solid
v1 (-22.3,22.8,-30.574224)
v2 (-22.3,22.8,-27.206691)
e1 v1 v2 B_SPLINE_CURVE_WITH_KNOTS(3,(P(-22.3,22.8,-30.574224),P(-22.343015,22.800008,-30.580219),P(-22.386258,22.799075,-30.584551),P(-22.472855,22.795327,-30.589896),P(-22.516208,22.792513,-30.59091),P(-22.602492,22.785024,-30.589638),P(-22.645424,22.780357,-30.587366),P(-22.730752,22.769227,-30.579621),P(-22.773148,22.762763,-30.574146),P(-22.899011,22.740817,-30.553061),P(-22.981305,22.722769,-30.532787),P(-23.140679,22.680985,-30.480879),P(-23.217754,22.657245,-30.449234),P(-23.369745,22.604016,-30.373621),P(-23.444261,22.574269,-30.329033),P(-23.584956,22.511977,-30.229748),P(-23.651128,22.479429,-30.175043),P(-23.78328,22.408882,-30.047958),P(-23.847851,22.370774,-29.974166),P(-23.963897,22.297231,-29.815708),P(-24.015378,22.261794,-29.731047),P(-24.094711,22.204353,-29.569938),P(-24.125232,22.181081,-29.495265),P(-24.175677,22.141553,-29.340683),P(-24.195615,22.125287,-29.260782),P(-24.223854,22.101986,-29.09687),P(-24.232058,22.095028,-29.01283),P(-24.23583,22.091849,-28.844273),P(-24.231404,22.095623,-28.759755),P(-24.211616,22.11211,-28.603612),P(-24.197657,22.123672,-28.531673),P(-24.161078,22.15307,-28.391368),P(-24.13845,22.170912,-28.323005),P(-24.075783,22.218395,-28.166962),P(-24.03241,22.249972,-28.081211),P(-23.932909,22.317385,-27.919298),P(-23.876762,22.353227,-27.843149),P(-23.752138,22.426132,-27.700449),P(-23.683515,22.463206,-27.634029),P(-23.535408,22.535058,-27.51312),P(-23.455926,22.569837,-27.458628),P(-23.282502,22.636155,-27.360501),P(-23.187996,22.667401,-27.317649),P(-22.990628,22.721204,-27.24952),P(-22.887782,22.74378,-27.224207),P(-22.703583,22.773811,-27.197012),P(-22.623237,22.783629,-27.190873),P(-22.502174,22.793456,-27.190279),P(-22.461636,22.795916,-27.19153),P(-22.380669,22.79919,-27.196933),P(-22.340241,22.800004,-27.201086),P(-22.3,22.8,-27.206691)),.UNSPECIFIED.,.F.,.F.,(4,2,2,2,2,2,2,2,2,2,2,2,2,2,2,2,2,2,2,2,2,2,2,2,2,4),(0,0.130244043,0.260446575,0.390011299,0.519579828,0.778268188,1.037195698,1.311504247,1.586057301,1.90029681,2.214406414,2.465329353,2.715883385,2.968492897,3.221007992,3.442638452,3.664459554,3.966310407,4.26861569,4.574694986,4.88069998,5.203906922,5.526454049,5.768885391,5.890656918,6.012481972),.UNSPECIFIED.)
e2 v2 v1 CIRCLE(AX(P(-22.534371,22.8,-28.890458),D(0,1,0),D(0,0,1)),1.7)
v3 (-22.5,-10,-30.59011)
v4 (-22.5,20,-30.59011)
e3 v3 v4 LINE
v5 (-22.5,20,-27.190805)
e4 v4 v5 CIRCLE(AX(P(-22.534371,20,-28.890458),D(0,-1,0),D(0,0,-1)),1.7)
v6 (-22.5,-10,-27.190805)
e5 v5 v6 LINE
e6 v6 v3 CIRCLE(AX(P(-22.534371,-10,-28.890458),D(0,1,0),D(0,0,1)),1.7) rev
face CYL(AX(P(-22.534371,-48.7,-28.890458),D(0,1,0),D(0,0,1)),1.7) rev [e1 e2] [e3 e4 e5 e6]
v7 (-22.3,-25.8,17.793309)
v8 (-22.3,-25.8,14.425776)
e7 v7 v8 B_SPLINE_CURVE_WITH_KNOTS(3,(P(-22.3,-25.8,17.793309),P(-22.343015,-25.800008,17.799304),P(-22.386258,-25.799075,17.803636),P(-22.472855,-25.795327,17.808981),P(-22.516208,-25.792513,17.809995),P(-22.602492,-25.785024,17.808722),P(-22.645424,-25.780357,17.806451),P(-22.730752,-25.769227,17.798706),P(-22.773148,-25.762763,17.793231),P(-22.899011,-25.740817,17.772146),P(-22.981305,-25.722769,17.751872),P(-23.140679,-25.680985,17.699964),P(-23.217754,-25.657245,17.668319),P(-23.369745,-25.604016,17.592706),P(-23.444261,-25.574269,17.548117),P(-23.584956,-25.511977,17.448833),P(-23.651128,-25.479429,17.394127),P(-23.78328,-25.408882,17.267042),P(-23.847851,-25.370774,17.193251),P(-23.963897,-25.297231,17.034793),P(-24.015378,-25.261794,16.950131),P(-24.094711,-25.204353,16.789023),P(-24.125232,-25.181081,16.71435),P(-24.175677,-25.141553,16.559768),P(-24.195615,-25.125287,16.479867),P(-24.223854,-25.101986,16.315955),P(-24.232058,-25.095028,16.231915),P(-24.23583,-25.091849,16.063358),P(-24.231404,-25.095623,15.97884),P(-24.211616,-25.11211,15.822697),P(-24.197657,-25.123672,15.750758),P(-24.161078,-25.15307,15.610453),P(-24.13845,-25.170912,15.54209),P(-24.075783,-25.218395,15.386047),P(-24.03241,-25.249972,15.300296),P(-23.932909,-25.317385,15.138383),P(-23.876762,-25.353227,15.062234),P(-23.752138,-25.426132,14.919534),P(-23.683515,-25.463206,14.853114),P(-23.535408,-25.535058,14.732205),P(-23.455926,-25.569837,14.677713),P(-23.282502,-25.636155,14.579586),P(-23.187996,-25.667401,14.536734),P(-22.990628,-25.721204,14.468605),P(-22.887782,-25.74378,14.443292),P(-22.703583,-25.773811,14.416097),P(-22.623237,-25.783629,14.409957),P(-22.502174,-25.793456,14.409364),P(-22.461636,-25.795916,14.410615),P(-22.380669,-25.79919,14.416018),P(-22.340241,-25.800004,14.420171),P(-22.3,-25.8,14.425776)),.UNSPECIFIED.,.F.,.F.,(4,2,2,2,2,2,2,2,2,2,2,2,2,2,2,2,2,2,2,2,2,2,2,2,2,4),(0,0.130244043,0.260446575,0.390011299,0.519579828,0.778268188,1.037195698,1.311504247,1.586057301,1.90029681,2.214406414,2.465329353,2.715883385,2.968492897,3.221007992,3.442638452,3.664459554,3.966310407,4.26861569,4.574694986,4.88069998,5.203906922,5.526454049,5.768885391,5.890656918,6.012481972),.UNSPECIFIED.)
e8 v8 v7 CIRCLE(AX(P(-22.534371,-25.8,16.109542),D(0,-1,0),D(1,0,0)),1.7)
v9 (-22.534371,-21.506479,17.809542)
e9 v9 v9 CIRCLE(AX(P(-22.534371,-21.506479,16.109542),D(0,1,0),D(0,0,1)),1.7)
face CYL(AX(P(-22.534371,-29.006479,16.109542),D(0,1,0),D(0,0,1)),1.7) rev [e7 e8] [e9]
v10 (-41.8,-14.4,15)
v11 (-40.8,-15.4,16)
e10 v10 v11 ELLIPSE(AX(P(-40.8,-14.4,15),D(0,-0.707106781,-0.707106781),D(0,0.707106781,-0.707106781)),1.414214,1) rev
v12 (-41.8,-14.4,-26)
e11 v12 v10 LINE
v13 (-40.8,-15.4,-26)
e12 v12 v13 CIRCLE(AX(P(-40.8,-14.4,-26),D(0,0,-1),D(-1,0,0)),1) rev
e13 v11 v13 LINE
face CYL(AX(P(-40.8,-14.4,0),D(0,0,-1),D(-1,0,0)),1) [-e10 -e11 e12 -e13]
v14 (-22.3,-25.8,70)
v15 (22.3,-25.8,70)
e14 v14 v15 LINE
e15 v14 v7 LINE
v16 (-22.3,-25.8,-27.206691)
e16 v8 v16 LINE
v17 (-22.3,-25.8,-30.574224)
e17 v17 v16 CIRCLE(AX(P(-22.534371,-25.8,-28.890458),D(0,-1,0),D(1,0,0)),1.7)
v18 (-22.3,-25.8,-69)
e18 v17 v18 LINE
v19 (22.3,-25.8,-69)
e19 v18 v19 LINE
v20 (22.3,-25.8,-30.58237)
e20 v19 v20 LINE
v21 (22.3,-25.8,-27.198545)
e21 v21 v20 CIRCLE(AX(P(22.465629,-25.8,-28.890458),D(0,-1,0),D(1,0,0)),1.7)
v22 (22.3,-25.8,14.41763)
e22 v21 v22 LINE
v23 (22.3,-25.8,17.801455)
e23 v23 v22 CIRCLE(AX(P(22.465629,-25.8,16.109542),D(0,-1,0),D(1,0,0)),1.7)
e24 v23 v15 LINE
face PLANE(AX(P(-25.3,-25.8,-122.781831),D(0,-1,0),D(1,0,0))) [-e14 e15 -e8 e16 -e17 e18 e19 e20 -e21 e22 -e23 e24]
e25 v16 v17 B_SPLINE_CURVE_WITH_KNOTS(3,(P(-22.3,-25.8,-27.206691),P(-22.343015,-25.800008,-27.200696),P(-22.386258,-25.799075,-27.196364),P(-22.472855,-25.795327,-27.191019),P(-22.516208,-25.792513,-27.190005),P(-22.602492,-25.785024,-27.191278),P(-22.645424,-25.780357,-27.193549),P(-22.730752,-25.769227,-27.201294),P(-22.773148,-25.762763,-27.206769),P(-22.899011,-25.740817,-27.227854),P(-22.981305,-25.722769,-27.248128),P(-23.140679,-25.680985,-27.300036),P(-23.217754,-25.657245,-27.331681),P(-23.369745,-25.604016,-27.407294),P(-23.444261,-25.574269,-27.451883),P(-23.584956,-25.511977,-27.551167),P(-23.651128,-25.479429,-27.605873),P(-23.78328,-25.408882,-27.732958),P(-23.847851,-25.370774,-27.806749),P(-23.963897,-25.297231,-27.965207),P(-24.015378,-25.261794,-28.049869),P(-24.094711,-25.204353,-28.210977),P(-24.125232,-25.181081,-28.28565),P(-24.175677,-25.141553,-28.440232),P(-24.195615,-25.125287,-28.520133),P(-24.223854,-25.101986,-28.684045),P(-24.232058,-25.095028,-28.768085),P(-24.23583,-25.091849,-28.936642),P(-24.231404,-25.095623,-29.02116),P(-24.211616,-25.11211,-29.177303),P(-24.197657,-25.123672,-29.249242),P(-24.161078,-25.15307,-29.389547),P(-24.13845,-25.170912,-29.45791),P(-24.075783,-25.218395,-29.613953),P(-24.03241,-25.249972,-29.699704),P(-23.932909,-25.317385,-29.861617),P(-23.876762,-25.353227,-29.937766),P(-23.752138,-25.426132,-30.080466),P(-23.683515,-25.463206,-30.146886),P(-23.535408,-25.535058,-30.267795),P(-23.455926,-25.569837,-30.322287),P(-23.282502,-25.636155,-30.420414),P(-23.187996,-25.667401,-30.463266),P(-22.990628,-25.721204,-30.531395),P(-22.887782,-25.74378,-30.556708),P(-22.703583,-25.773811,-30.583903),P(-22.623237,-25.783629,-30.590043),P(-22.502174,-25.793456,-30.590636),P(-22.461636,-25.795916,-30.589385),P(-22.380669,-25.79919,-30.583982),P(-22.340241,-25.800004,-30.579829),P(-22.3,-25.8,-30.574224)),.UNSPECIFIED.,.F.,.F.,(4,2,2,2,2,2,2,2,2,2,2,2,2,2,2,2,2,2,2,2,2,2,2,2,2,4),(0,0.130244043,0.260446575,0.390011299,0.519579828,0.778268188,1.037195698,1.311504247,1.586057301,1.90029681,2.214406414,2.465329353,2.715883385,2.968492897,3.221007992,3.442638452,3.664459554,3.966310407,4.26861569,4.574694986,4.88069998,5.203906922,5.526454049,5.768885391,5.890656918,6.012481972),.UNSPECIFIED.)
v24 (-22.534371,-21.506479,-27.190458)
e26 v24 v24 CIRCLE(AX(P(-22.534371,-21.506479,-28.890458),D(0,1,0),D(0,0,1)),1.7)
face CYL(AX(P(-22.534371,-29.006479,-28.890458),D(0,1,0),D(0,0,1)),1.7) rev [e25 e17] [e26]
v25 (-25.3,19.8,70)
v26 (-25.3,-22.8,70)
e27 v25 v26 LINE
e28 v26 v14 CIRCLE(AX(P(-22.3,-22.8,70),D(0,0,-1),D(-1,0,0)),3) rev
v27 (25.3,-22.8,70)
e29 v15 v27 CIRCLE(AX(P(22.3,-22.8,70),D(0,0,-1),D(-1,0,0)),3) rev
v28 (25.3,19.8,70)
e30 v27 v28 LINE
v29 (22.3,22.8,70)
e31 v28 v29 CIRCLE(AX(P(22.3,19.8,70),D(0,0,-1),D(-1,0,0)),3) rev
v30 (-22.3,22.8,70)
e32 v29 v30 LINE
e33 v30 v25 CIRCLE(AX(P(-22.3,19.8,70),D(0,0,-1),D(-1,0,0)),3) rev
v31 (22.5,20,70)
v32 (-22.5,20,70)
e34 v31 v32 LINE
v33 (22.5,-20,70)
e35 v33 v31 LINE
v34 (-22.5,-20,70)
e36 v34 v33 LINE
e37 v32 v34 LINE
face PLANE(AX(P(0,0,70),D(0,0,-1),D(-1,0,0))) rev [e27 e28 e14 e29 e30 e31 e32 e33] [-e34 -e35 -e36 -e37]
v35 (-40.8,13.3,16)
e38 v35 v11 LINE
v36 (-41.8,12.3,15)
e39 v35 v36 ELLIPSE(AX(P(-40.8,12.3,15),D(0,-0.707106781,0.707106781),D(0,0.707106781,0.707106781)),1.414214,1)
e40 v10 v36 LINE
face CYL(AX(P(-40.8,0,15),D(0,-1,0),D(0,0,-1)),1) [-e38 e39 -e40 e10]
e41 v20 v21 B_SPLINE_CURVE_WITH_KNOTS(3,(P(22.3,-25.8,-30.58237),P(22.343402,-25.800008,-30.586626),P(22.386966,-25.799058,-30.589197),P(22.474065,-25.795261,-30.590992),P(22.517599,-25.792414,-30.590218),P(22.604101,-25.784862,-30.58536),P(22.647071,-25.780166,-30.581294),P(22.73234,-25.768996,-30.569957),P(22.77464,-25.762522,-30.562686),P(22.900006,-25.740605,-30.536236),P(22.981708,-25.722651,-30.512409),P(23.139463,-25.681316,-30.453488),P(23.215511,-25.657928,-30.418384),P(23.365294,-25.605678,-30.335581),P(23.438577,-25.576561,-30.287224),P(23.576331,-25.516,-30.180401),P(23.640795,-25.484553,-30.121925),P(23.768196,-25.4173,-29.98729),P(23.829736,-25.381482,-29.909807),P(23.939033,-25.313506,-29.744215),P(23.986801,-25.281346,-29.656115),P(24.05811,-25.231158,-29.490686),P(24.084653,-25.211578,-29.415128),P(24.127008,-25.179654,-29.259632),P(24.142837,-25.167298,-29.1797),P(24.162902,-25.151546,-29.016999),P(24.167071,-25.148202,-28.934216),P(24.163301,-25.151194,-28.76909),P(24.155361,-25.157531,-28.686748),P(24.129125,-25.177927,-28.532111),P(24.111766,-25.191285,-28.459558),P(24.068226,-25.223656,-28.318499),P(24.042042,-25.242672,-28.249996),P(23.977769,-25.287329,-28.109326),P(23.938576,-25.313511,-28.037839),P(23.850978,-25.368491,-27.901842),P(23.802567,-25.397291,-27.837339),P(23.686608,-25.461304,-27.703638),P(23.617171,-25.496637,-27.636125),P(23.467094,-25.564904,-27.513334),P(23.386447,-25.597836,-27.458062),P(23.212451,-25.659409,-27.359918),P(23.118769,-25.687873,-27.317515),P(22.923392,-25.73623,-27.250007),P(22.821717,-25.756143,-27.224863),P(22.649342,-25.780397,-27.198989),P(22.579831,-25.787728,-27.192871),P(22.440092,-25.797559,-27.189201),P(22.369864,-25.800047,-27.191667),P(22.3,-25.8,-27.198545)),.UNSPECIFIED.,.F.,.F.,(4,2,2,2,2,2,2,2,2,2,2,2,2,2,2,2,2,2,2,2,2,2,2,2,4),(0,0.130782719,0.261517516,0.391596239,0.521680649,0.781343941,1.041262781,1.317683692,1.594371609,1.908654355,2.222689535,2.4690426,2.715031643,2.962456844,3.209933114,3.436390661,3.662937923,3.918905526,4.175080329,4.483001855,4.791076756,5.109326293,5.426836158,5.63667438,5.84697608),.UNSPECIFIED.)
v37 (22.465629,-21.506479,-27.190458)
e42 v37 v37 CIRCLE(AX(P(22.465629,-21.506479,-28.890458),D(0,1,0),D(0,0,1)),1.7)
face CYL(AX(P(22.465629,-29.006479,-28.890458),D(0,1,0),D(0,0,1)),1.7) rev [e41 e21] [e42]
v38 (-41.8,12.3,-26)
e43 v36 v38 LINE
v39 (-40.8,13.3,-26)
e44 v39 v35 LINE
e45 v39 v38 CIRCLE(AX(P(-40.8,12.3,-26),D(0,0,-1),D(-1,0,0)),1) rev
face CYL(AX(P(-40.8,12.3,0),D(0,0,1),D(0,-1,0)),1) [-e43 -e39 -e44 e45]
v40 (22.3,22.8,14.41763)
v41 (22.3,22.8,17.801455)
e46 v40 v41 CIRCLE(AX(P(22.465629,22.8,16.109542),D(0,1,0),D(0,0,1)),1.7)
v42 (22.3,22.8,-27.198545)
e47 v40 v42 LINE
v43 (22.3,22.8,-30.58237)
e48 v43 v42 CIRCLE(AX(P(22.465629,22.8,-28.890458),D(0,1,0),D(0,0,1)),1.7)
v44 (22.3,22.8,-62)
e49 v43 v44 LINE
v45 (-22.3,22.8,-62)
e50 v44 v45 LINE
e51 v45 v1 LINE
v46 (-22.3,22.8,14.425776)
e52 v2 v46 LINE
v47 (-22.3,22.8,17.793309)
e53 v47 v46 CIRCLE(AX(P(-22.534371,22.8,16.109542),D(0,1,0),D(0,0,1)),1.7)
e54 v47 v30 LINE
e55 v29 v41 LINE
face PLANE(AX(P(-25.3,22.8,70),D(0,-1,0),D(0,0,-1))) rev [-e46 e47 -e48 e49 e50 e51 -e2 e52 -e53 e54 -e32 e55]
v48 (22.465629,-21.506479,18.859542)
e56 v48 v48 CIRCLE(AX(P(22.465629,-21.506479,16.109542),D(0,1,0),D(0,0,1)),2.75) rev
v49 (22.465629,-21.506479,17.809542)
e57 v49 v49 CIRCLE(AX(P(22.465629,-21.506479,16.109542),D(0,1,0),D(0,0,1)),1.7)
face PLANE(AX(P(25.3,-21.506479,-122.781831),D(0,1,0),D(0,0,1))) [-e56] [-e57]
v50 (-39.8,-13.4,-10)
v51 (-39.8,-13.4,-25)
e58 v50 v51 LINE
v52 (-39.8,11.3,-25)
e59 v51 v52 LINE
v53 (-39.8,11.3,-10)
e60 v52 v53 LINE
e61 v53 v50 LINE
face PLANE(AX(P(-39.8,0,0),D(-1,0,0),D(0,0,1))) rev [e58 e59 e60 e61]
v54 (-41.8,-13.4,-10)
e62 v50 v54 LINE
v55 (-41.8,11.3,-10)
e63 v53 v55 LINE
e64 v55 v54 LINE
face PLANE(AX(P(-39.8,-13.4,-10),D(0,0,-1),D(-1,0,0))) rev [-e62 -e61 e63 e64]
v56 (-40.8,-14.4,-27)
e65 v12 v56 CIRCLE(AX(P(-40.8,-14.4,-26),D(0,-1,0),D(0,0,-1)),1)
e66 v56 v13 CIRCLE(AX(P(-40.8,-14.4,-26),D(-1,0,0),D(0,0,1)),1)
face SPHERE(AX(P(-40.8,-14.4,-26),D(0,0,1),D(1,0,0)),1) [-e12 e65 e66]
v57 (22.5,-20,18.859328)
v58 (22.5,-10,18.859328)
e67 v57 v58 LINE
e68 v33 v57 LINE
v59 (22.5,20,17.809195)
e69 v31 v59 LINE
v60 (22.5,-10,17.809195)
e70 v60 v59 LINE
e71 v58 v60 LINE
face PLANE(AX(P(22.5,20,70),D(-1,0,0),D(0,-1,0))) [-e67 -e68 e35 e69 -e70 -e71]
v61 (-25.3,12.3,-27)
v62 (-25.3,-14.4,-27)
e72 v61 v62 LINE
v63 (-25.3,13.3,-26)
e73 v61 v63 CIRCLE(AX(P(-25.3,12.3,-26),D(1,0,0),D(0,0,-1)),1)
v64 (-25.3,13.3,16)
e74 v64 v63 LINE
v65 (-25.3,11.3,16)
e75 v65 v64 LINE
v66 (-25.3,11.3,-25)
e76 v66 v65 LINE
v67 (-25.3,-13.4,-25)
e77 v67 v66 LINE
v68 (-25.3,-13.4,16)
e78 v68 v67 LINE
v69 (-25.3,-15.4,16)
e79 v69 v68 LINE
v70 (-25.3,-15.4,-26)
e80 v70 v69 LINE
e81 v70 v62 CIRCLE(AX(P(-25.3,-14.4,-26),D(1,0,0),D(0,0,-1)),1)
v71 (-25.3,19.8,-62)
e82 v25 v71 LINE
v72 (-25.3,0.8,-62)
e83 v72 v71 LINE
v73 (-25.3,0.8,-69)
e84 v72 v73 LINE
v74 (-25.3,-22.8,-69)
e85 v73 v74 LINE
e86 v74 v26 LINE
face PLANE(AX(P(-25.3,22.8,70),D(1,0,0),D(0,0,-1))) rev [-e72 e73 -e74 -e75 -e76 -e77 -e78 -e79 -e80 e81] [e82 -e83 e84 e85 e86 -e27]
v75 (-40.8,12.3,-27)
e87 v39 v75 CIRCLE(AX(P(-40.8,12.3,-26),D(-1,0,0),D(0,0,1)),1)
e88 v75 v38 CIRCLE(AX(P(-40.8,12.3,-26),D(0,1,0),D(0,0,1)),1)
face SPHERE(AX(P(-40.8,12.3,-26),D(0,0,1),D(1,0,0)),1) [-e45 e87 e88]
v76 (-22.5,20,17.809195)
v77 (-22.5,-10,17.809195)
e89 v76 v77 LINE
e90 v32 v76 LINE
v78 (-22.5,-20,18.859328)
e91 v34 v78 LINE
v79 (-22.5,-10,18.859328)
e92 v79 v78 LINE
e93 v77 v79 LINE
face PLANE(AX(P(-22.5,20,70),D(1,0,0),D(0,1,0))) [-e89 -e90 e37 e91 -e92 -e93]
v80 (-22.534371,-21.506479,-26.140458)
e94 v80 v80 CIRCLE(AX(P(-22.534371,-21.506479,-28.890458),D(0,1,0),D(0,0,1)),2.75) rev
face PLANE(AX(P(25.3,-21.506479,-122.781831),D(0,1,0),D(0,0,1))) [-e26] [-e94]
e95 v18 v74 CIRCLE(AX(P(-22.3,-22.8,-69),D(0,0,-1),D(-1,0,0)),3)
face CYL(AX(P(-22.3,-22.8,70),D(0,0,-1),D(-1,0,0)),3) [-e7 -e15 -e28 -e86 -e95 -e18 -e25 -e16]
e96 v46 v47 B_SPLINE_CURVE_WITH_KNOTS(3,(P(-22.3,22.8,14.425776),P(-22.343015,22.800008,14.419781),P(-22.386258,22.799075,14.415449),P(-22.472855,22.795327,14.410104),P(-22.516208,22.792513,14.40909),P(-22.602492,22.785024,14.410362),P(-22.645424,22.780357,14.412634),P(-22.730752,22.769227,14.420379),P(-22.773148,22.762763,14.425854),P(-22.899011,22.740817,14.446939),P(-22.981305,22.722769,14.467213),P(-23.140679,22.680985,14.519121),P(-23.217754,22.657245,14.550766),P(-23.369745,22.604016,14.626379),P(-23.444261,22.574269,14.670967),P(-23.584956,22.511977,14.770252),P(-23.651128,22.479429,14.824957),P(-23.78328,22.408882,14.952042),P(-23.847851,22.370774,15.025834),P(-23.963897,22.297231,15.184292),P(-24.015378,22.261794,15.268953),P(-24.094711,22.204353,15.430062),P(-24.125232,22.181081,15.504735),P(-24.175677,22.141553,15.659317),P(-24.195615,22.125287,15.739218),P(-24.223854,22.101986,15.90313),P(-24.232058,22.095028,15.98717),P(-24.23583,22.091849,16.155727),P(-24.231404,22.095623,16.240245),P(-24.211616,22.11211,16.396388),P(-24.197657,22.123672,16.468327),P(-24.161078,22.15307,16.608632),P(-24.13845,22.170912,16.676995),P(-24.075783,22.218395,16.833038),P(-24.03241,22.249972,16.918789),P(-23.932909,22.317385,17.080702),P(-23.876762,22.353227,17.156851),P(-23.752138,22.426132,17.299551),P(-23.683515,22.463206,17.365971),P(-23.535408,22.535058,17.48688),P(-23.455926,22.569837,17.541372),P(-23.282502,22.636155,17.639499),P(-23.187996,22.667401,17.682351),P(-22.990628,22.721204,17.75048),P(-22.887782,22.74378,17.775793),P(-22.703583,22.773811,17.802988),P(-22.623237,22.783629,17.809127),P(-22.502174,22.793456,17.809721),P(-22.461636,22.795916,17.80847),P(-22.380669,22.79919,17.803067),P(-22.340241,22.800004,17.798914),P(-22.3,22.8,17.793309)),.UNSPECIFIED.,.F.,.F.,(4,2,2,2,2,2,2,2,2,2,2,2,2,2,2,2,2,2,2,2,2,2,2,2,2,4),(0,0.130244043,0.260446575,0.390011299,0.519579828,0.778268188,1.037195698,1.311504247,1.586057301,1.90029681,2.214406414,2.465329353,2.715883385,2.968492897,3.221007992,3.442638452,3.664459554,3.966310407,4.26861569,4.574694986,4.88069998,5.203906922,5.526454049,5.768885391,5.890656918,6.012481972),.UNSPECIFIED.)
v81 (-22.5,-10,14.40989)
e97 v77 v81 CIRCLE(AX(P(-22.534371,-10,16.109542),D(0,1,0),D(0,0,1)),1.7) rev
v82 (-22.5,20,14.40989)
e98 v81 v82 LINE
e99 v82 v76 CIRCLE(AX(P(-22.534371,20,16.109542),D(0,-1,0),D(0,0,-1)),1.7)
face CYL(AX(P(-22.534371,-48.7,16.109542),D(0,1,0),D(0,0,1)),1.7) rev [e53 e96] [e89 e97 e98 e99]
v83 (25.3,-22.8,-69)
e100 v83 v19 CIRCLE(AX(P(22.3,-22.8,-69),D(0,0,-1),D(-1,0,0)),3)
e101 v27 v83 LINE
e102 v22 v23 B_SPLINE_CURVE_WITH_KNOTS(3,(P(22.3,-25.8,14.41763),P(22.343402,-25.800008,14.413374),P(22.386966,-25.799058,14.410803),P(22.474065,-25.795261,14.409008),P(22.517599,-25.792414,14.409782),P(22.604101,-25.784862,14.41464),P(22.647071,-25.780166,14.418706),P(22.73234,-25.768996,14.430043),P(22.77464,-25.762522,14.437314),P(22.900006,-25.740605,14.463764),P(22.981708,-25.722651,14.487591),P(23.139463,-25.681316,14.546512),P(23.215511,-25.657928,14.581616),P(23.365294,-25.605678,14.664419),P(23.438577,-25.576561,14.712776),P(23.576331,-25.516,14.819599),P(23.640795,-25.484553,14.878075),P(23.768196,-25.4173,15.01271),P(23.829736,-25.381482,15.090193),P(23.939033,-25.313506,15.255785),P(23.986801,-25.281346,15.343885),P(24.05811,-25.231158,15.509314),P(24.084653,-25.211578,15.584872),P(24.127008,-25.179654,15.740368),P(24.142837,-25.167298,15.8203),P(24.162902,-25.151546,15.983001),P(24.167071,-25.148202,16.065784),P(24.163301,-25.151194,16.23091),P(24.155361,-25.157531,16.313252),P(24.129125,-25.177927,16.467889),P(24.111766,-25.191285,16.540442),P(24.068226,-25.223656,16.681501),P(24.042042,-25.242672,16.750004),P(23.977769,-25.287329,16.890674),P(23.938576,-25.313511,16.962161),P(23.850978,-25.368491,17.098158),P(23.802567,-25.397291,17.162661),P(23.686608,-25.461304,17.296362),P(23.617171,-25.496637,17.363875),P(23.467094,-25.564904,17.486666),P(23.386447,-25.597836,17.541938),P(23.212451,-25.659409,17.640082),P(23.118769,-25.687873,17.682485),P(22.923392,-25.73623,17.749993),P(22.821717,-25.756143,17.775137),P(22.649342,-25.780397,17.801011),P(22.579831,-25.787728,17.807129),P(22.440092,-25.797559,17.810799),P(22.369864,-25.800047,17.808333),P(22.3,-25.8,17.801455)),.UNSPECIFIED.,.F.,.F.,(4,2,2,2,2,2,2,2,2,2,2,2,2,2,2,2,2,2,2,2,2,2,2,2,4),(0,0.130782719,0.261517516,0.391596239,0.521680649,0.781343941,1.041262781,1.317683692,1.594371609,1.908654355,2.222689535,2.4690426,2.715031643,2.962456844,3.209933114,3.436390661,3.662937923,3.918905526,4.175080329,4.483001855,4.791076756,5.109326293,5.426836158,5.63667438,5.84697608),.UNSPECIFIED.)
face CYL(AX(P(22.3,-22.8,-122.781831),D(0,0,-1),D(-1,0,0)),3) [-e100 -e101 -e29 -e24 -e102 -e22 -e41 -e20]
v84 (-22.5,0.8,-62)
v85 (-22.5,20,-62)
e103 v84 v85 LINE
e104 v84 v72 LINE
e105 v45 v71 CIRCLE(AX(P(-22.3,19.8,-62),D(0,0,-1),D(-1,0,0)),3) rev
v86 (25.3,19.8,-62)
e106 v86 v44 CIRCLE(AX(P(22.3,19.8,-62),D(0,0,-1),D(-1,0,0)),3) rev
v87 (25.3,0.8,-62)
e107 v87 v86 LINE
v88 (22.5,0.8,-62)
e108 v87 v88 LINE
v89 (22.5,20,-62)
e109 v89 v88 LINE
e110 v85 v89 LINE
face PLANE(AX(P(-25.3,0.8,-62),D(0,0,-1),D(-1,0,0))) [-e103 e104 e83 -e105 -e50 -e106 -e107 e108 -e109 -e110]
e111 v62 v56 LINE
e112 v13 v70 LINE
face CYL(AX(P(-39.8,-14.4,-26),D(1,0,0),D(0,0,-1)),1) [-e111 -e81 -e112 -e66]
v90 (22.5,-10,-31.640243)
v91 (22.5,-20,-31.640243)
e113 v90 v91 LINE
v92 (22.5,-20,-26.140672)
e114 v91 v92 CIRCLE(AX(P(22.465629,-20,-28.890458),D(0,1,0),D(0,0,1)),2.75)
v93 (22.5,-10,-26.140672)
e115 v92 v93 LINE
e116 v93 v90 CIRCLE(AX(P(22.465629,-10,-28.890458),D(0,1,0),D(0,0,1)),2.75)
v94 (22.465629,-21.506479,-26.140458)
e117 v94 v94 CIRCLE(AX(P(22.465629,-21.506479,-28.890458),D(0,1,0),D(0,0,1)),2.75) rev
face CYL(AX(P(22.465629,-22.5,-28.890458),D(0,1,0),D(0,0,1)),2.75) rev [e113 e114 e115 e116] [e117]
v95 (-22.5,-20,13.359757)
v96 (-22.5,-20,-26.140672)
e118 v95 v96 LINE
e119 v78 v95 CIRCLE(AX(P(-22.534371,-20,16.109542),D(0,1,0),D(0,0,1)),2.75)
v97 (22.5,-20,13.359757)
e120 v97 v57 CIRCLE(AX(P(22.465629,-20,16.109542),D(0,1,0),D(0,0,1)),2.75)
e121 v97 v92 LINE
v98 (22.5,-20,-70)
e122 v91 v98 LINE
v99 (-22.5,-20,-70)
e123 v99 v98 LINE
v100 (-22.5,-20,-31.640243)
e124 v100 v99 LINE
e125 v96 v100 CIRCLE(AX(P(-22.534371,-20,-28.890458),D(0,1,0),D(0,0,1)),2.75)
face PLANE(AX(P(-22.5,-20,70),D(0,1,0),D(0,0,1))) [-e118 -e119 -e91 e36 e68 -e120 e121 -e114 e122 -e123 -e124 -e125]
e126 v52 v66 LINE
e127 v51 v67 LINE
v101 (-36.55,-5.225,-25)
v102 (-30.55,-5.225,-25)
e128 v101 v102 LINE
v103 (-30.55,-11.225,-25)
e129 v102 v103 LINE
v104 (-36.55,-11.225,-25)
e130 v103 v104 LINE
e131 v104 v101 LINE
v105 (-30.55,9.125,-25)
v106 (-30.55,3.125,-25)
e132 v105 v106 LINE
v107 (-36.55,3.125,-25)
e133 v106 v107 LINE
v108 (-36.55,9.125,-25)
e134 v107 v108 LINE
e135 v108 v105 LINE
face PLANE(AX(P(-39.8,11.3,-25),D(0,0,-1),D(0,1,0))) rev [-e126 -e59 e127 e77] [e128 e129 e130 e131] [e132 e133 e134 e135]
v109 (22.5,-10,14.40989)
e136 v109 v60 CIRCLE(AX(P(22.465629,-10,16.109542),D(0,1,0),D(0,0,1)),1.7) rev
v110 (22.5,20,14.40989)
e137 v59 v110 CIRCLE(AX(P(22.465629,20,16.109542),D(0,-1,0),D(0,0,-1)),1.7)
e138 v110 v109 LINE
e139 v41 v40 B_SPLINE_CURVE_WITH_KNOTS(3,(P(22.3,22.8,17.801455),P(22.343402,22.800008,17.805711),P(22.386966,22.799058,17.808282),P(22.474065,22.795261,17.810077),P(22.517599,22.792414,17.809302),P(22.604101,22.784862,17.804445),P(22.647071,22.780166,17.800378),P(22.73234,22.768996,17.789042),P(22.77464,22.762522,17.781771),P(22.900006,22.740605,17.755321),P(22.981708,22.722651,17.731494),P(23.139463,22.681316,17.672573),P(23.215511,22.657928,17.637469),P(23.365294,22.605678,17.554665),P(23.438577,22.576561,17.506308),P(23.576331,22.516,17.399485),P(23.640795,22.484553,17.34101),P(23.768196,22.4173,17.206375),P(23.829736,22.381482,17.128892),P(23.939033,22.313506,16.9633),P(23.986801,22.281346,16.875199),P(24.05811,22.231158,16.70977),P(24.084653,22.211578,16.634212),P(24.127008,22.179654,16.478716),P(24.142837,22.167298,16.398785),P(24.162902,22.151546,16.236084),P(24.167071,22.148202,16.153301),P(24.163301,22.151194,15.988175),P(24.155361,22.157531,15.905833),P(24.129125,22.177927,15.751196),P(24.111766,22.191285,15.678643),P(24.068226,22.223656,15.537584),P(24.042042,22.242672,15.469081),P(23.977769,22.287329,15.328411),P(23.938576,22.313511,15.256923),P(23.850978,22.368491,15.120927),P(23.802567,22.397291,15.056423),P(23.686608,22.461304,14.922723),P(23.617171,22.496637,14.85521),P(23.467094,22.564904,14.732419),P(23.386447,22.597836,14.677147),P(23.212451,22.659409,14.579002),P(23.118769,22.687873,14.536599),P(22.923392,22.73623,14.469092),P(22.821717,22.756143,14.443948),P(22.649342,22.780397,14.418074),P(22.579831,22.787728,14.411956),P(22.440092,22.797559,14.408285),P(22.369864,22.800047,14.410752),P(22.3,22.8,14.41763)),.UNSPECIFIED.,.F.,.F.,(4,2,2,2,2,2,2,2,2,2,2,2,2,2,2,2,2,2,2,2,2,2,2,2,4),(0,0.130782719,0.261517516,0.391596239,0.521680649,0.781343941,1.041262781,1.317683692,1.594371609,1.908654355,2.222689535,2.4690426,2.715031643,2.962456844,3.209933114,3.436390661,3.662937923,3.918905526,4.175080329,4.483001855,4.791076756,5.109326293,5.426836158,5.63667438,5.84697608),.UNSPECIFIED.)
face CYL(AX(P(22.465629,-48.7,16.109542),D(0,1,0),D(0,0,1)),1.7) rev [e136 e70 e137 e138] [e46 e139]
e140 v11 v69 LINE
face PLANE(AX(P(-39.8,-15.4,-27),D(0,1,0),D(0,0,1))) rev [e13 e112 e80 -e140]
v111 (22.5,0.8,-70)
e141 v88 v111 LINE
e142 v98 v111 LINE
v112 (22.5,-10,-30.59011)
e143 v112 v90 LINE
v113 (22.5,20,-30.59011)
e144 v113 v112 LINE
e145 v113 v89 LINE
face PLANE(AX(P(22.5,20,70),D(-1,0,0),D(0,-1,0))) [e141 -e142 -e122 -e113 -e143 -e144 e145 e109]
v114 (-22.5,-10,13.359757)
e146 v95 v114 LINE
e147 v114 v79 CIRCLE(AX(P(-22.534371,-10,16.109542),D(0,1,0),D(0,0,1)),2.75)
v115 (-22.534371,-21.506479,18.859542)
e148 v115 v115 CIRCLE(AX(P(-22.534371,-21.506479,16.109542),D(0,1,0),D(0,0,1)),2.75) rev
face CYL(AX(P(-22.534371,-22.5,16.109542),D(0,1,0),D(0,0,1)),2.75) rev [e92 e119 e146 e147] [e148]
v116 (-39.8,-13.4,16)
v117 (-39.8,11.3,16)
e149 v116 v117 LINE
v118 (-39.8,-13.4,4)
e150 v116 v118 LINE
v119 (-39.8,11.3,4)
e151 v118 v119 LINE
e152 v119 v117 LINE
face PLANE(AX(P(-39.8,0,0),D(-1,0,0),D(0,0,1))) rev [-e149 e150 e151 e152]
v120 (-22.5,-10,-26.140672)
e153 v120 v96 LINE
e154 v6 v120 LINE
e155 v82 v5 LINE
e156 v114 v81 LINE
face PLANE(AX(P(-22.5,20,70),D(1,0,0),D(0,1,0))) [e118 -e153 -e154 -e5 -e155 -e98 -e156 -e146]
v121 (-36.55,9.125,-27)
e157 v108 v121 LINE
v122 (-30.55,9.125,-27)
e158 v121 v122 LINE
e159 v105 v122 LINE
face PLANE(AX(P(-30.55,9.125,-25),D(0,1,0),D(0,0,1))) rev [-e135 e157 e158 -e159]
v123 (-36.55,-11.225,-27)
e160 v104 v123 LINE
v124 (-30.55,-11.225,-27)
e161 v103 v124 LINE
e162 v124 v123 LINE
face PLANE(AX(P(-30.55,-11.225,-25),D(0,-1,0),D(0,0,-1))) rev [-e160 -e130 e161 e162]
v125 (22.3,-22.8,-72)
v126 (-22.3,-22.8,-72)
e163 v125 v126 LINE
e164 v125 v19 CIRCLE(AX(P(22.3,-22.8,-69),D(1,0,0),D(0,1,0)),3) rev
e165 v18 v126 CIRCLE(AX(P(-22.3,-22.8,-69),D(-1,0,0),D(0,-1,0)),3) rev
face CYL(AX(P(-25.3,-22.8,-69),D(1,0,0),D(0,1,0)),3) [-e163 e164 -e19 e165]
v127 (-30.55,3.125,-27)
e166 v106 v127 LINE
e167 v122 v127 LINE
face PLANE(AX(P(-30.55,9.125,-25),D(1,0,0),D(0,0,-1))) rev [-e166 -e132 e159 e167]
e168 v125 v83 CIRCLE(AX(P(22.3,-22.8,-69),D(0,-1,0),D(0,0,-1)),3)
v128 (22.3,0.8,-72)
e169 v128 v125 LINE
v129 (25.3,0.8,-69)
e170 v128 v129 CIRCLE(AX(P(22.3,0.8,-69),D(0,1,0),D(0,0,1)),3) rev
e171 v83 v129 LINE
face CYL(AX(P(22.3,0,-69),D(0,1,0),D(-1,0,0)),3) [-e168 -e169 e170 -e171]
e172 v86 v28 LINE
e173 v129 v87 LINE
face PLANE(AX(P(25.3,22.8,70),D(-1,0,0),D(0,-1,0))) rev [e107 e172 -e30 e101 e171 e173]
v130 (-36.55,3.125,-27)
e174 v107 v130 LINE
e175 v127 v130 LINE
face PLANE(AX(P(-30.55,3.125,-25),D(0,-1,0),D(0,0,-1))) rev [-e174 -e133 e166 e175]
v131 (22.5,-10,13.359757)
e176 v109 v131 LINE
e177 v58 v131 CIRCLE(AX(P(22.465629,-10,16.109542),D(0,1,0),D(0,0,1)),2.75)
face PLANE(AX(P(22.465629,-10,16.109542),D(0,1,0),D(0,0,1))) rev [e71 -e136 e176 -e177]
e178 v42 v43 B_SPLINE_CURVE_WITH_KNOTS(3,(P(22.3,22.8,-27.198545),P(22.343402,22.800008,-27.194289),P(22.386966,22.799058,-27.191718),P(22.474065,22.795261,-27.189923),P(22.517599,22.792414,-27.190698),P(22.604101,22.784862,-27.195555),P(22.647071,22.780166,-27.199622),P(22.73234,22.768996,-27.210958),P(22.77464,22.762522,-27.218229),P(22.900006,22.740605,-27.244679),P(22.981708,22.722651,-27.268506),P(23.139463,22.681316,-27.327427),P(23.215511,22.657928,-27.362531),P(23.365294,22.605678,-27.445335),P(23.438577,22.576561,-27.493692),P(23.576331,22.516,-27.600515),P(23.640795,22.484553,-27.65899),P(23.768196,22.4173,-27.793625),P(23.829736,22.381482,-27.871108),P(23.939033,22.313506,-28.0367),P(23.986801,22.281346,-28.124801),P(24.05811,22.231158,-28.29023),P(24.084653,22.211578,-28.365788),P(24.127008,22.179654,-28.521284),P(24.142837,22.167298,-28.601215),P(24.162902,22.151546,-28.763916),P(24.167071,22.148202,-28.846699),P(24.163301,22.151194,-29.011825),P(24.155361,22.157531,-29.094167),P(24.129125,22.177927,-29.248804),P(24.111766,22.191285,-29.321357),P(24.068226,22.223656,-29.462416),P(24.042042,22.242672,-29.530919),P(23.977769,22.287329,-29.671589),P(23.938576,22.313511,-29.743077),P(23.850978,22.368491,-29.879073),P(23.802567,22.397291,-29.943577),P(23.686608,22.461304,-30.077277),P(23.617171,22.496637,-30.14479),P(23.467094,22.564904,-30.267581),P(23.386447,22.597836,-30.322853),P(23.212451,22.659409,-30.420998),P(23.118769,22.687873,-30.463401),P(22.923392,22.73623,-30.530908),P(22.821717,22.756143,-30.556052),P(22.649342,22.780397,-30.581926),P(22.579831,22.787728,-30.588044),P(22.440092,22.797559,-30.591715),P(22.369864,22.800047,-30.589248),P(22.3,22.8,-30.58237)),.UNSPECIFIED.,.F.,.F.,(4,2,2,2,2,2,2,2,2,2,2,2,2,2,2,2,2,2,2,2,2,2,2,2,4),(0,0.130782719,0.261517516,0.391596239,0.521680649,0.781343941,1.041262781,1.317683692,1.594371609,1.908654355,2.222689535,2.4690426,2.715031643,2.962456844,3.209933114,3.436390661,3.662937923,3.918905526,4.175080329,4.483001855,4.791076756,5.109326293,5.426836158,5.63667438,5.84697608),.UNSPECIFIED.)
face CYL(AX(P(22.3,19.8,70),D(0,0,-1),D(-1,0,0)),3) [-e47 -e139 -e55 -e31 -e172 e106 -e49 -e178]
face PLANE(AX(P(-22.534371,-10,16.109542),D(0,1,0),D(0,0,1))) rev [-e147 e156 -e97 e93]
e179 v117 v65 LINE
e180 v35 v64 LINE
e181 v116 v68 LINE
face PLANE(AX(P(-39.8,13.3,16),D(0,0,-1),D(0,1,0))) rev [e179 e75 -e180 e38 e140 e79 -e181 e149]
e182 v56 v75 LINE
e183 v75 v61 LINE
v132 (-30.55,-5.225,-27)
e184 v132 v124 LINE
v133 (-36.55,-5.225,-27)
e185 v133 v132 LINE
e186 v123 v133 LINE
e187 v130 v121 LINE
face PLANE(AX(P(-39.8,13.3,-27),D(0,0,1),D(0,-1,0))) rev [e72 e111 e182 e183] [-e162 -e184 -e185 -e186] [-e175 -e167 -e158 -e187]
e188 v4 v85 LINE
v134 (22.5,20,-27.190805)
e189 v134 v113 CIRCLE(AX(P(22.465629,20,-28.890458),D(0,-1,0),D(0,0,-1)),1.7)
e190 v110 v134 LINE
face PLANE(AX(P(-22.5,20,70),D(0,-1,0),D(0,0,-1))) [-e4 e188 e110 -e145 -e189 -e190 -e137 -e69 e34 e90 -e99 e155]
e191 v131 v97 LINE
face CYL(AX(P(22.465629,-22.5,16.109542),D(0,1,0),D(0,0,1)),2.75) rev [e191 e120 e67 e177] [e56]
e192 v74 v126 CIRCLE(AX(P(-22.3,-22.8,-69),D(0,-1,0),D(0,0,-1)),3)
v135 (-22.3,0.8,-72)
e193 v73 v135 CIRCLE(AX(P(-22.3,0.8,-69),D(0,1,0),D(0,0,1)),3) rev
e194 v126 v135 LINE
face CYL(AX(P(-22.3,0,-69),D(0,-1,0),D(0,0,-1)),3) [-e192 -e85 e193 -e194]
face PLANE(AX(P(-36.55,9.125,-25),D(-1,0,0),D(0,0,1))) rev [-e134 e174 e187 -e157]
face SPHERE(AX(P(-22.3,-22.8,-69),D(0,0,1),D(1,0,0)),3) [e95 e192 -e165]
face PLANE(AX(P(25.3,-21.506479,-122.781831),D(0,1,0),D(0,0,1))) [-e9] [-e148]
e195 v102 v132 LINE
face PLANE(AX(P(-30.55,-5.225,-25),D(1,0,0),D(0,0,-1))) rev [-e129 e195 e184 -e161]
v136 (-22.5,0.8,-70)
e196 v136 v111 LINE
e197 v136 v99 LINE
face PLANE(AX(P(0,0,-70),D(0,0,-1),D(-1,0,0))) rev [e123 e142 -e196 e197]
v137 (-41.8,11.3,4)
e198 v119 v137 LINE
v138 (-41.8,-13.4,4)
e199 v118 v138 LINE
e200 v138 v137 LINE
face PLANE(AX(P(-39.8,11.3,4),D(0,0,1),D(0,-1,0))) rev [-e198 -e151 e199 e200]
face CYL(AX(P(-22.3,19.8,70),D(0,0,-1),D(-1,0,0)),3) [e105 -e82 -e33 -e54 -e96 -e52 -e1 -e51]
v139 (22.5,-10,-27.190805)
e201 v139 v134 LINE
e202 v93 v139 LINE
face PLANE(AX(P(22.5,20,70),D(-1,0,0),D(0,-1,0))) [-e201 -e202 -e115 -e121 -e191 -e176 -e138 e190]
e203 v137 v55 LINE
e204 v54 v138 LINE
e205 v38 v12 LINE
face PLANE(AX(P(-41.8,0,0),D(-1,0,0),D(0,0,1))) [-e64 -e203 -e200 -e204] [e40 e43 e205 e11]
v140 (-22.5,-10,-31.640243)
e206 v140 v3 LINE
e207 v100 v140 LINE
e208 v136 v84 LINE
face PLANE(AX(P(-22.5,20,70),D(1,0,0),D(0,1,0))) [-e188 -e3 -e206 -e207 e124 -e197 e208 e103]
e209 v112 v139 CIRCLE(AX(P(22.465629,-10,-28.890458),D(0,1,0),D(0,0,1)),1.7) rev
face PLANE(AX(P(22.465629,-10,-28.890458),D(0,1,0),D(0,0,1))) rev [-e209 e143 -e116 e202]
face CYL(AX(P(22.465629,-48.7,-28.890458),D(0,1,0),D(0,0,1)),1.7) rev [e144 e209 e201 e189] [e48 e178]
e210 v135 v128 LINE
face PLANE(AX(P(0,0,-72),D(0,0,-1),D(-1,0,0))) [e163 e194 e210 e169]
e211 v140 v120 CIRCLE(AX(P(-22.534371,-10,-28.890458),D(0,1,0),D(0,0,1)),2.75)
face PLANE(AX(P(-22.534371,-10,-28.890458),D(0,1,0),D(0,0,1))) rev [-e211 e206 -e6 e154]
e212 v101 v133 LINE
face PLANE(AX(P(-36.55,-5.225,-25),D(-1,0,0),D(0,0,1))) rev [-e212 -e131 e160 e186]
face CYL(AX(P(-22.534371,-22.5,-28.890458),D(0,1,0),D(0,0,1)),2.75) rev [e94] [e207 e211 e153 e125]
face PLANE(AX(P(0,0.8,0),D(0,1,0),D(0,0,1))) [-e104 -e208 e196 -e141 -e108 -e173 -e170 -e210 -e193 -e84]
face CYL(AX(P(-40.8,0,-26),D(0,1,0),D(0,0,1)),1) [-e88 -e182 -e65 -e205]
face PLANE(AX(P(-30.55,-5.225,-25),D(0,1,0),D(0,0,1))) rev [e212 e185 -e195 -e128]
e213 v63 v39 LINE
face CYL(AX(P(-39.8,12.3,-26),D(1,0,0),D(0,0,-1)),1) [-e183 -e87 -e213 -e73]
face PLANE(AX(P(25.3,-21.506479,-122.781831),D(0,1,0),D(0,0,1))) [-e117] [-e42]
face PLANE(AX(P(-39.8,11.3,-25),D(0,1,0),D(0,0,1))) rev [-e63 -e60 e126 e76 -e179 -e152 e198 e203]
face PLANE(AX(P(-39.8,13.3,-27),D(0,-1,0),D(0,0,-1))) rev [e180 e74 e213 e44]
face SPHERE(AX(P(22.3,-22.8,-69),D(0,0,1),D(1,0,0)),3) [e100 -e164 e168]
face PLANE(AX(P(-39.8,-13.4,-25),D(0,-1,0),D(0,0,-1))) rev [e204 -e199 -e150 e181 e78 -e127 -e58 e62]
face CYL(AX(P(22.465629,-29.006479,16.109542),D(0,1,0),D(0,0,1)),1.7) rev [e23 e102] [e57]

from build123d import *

# Parameters (mm, degrees)
SKETCH1_W           = 50.6
SKETCH1_H           = 45.6
SKETCH1_W_2         = 45
SKETCH1_H_2         = 40
BOSS_EXTRUDE1_DEPTH = 70
SKETCH2_W           = 50.6
SKETCH2_H           = 45.6
BOSS_EXTRUDE2_DEPTH = 2
SKETCH4_R           = 1.7
CUT_EXTRUDE1_DEPTH  = 71.5
SKETCH5_R           = 2.75
CUT_EXTRUDE2_DEPTH  = 12.5
SKETCH6_W           = 50.6
SKETCH6_H           = 4.293520681
BOSS_EXTRUDE3_DEPTH = 142
SKETCH7_R           = 1.7
CUT_EXTRUDE3_DEPTH  = 7.5
FILLET1_R           = 3
CUT_EXTRUDE4_DEPTH  = 22
BOSS_EXTRUDE4_DEPTH = 14.5
SKETCH10_W          = 43
SKETCH10_H          = 28.7
BOSS_EXTRUDE5_DEPTH = 2
SKETCH11_W          = 14
SKETCH11_H          = 24.7
CUT_EXTRUDE5_DEPTH  = 2
SKETCH12_W          = 6
SKETCH12_H          = 6
CUT_EXTRUDE6_DEPTH  = 2
FILLET2_R           = 1


with BuildPart() as part:
    # Sketch1 → Boss-Extrude1 (new, symmetric)
    with BuildSketch(Plane.XY):
        Rectangle(SKETCH1_W, SKETCH1_H)
        Rectangle(SKETCH1_W_2, SKETCH1_H_2, mode=Mode.SUBTRACT)
    extrude(amount=BOSS_EXTRUDE1_DEPTH, both=True)

    # Sketch2 → Boss-Extrude2 (add)
    with BuildSketch(Plane(origin=(0, 0, -70), x_dir=(-1, 0, 0), z_dir=(0, 0, -1))):
        Rectangle(SKETCH2_W, SKETCH2_H)
    extrude(amount=BOSS_EXTRUDE2_DEPTH)

    # Sketch4 → Cut-Extrude1 (cut)
    with BuildSketch(Plane(origin=(0, 22.8, 0), x_dir=(1, 0, 0), z_dir=(0, 1, 0))):
        with Locations(Location((-22.534370918, 28.890457594, 0), (0, 0, 270))):
            Circle(SKETCH4_R)
        with Locations(Location((22.465629082, 28.890457594, 0), (0, 0, 270))):
            Circle(SKETCH4_R)
        with Locations(Location((22.465629082, -16.109542406, 0), (0, 0, 270))):
            Circle(SKETCH4_R)
        with Locations(Location((-22.534370918, -16.109542406, 0), (0, 0, 270))):
            Circle(SKETCH4_R)
    extrude(amount=-CUT_EXTRUDE1_DEPTH, mode=Mode.SUBTRACT)

    # Sketch5 → Cut-Extrude2 (cut)
    with BuildSketch(Plane(origin=(0, -10, 0), x_dir=(1, 0, 0), z_dir=(0, 1, 0))):
        with Locations(Location((22.465629082, 28.890457594, 0), (0, 0, 270))):
            Circle(SKETCH5_R)
        with Locations(Location((22.465629082, -16.109542406, 0), (0, 0, 270))):
            Circle(SKETCH5_R)
        with Locations(Location((-22.534370918, 28.890457594, 0), (0, 0, 270))):
            Circle(SKETCH5_R)
        with Locations(Location((-22.534370918, -16.109542406, 0), (0, 0, 270))):
            Circle(SKETCH5_R)
    extrude(amount=-CUT_EXTRUDE2_DEPTH, mode=Mode.SUBTRACT)

    # Sketch6 → Boss-Extrude3 (add)
    with BuildSketch(Plane.XY.offset(70)):
        with Locations((0, -23.65323966)):
            Rectangle(SKETCH6_W, SKETCH6_H)
    extrude(amount=-BOSS_EXTRUDE3_DEPTH)

    # Sketch7 → Cut-Extrude3 (cut)
    with BuildSketch(Plane(origin=(0, -21.506479319, 0), x_dir=(1, 0, 0), z_dir=(0, 1, 0))):
        with Locations(Location((-22.534370918, 28.890457594, 0), (0, 0, 270))):
            Circle(SKETCH7_R)
        with Locations(Location((22.465629082, 28.890457594, 0), (0, 0, 270))):
            Circle(SKETCH7_R)
        with Locations(Location((22.465629082, -16.109542406, 0), (0, 0, 270))):
            Circle(SKETCH7_R)
        with Locations(Location((-22.534370918, -16.109542406, 0), (0, 0, 270))):
            Circle(SKETCH7_R)
    extrude(amount=-CUT_EXTRUDE3_DEPTH, mode=Mode.SUBTRACT)

    # Fillet1
    # the kernel refuses this fillet: 3 mm, written as the material it takes off along each edge
    with BuildSketch(Plane(origin=(-22.3, -22.8, -69), x_dir=(0, 0, -1), z_dir=(-1, 0, 0))) as fillet1_piece_1_section:
        Polygon((0, 0), (FILLET1_R, 0), (FILLET1_R, FILLET1_R), (0, FILLET1_R), align=None)
    fillet1_piece_1 = extrude(amount=FILLET1_R, mode=Mode.PRIVATE)
    fillet1_piece_1 = fillet1_piece_1 - Plane(origin=(-22.3, -22.8, -69), x_dir=(-2.085182079516792e-15, 0.7071067811865475, 0.7071067811865475), z_dir=(-1, 0, 0)) * Sphere(FILLET1_R, mode=Mode.PRIVATE)
    add(fillet1_piece_1, mode=Mode.SUBTRACT)
    with BuildSketch(Plane(origin=(22.3, -22.8, -69), x_dir=(0, -1, 0), z_dir=(0, 0, -1))) as fillet1_piece_2_section:
        Polygon((0, 0), (FILLET1_R, 0), (FILLET1_R, -FILLET1_R), (0, -FILLET1_R), align=None)
    fillet1_piece_2 = extrude(amount=FILLET1_R, mode=Mode.PRIVATE)
    fillet1_piece_2 = fillet1_piece_2 - Plane(origin=(22.3, -22.8, -69), x_dir=(-0.7071067811865486, 0.7071067811865464, 0), z_dir=(0, 0, -1)) * Sphere(FILLET1_R, mode=Mode.PRIVATE)
    add(fillet1_piece_2, mode=Mode.SUBTRACT)
    with BuildSketch(Plane(origin=(22.3, 19.8, -69), x_dir=(0, 0, -1), z_dir=(0, 1, 0))) as fillet1_piece_3_section:
        Polygon((0, 0), (FILLET1_R, 0), (FILLET1_R, -FILLET1_R), (0, -FILLET1_R), align=None)
    fillet1_piece_3 = extrude(amount=FILLET1_R, mode=Mode.PRIVATE)
    fillet1_piece_3 = fillet1_piece_3 - Plane(origin=(22.3, 19.8, -69), x_dir=(-0.7071067811865475, 0, 0.7071067811865475), z_dir=(0, 1, 0)) * Sphere(FILLET1_R, mode=Mode.PRIVATE)
    add(fillet1_piece_3, mode=Mode.SUBTRACT)
    with BuildSketch(Plane(origin=(-22.3, 19.8, -69), x_dir=(0, 1, 0), z_dir=(-1, 0, 0))) as fillet1_piece_4_section:
        Polygon((0, 0), (FILLET1_R, 0), (FILLET1_R, FILLET1_R), (0, FILLET1_R), align=None)
    fillet1_piece_4 = extrude(amount=FILLET1_R, mode=Mode.PRIVATE)
    fillet1_piece_4 = fillet1_piece_4 - Plane(origin=(-22.3, 19.8, -69), x_dir=(0, -0.7071067811865475, 0.7071067811865475), z_dir=(-1, 0, 0)) * Sphere(FILLET1_R, mode=Mode.PRIVATE)
    add(fillet1_piece_4, mode=Mode.SUBTRACT)
    with BuildSketch(Plane(origin=(-25.3, -25.8, 77.5), x_dir=(0, 1, 0), z_dir=(0, 0, -1)), Plane(origin=(25.3, -25.8, 77.5), x_dir=(-1, 0, 0), z_dir=(0, 0, -1))) as fillet1_piece_5:
        with BuildLine():
            CenterArc((FILLET1_R, FILLET1_R), FILLET1_R, 180, 90)
            Line((0, FILLET1_R), (0, 0))
            Line((0, 0), (FILLET1_R, 0))
        make_face()
    extrude(amount=146.5, mode=Mode.SUBTRACT)
    with BuildSketch(Plane(origin=(-22.3, -25.8, -72), x_dir=(0, 1, 0), z_dir=(1, 0, 0))) as fillet1_piece_6:
        with BuildLine():
            CenterArc((FILLET1_R, FILLET1_R), FILLET1_R, 180, 90)
            Line((0, FILLET1_R), (0, 0))
            Line((0, 0), (FILLET1_R, 0))
        make_face()
    extrude(amount=44.6, mode=Mode.SUBTRACT)
    with BuildSketch(Plane(origin=(25.3, 19.8, -72), x_dir=(-1, 0, 0), z_dir=(0, -1, 0)), Plane(origin=(-25.3, 19.8, -72), x_dir=(0, 0, 1), z_dir=(0, -1, 0))) as fillet1_piece_7:
        with BuildLine():
            CenterArc((FILLET1_R, -FILLET1_R), FILLET1_R, 90, 90)
            Line((0, -FILLET1_R), (0, 0))
            Line((0, 0), (FILLET1_R, 0))
        make_face()
    extrude(amount=42.6, mode=Mode.SUBTRACT)
    with BuildSketch(Plane(origin=(22.3, 22.8, -72), x_dir=(0, 0, 1), z_dir=(-1, 0, 0))) as fillet1_piece_8:
        with BuildLine():
            CenterArc((FILLET1_R, -FILLET1_R), FILLET1_R, 90, 90)
            Line((0, -FILLET1_R), (0, 0))
            Line((0, 0), (FILLET1_R, 0))
        make_face()
    extrude(amount=44.6, mode=Mode.SUBTRACT)
    with BuildSketch(Plane(origin=(25.3, 22.8, 77.5), x_dir=(-1, 0, 0), z_dir=(0, 0, -1)), Plane(origin=(-25.3, 22.8, 77.5), x_dir=(0, -1, 0), z_dir=(0, 0, -1))) as fillet1_piece_9:
        with BuildLine():
            CenterArc((FILLET1_R, -FILLET1_R), FILLET1_R, 90, 90)
            Line((0, -FILLET1_R), (0, 0))
            Line((0, 0), (FILLET1_R, 0))
        make_face()
    extrude(amount=146.5, mode=Mode.SUBTRACT)

    # Sketch8 → Cut-Extrude4 (cut)
    with BuildSketch(Plane.XZ.offset(-22.8)):
        Polygon((-25.3, -62), (25.3, -62), (25.3, -72), (25.3, -74.989483602), (-25.3, -74.989483602), align=None)
    extrude(amount=CUT_EXTRUDE4_DEPTH, mode=Mode.SUBTRACT)

    # Sketch9 → Boss-Extrude4 (add)
    with BuildSketch(Plane.ZY.offset(25.3)):
        Polygon((-25, 11.3), (16, 11.3), (16, 13.3), (-27, 13.3), (-27, -15.4), (16, -15.4), (16, -13.4), (-25, -13.4), align=None)
    extrude(amount=BOSS_EXTRUDE4_DEPTH)

    # Sketch10 → Boss-Extrude5 (add)
    with BuildSketch(Plane.ZY.offset(39.8)):
        with Locations((-5.5, -1.05)):
            Rectangle(SKETCH10_W, SKETCH10_H)
    extrude(amount=BOSS_EXTRUDE5_DEPTH)

    # Sketch11 → Cut-Extrude5 (cut)
    with BuildSketch(Plane.ZY.offset(41.8)):
        with Locations((-3, -1.05)):
            Rectangle(SKETCH11_W, SKETCH11_H)
    extrude(amount=-CUT_EXTRUDE5_DEPTH, mode=Mode.SUBTRACT)

    # Sketch12 → Cut-Extrude6 (cut)
    with BuildSketch(Plane(origin=(0, 0, -27), x_dir=(-1, 0, 0), z_dir=(0, 0, -1))):
        with Locations((33.55, 6.125)):
            Rectangle(SKETCH12_W, SKETCH12_H)
        with Locations((33.55, -8.225)):
            Rectangle(SKETCH12_W, SKETCH12_H)
    extrude(amount=-CUT_EXTRUDE6_DEPTH, mode=Mode.SUBTRACT)

    # Fillet2
    fillet2_edges = [part.edges().sort_by_distance(p)[0] for p in [
        (-33.55, 13.3, -27),
        (-33.55, -15.4, -27),
        (-41.8, -1.05, -27),
        (-41.8, -15.4, -5.5),
        (-41.8, -1.05, 16),
        (-41.8, 13.3, -5.5),
    ]]
    fillet(fillet2_edges, radius=FILLET2_R)


solid = part.part
